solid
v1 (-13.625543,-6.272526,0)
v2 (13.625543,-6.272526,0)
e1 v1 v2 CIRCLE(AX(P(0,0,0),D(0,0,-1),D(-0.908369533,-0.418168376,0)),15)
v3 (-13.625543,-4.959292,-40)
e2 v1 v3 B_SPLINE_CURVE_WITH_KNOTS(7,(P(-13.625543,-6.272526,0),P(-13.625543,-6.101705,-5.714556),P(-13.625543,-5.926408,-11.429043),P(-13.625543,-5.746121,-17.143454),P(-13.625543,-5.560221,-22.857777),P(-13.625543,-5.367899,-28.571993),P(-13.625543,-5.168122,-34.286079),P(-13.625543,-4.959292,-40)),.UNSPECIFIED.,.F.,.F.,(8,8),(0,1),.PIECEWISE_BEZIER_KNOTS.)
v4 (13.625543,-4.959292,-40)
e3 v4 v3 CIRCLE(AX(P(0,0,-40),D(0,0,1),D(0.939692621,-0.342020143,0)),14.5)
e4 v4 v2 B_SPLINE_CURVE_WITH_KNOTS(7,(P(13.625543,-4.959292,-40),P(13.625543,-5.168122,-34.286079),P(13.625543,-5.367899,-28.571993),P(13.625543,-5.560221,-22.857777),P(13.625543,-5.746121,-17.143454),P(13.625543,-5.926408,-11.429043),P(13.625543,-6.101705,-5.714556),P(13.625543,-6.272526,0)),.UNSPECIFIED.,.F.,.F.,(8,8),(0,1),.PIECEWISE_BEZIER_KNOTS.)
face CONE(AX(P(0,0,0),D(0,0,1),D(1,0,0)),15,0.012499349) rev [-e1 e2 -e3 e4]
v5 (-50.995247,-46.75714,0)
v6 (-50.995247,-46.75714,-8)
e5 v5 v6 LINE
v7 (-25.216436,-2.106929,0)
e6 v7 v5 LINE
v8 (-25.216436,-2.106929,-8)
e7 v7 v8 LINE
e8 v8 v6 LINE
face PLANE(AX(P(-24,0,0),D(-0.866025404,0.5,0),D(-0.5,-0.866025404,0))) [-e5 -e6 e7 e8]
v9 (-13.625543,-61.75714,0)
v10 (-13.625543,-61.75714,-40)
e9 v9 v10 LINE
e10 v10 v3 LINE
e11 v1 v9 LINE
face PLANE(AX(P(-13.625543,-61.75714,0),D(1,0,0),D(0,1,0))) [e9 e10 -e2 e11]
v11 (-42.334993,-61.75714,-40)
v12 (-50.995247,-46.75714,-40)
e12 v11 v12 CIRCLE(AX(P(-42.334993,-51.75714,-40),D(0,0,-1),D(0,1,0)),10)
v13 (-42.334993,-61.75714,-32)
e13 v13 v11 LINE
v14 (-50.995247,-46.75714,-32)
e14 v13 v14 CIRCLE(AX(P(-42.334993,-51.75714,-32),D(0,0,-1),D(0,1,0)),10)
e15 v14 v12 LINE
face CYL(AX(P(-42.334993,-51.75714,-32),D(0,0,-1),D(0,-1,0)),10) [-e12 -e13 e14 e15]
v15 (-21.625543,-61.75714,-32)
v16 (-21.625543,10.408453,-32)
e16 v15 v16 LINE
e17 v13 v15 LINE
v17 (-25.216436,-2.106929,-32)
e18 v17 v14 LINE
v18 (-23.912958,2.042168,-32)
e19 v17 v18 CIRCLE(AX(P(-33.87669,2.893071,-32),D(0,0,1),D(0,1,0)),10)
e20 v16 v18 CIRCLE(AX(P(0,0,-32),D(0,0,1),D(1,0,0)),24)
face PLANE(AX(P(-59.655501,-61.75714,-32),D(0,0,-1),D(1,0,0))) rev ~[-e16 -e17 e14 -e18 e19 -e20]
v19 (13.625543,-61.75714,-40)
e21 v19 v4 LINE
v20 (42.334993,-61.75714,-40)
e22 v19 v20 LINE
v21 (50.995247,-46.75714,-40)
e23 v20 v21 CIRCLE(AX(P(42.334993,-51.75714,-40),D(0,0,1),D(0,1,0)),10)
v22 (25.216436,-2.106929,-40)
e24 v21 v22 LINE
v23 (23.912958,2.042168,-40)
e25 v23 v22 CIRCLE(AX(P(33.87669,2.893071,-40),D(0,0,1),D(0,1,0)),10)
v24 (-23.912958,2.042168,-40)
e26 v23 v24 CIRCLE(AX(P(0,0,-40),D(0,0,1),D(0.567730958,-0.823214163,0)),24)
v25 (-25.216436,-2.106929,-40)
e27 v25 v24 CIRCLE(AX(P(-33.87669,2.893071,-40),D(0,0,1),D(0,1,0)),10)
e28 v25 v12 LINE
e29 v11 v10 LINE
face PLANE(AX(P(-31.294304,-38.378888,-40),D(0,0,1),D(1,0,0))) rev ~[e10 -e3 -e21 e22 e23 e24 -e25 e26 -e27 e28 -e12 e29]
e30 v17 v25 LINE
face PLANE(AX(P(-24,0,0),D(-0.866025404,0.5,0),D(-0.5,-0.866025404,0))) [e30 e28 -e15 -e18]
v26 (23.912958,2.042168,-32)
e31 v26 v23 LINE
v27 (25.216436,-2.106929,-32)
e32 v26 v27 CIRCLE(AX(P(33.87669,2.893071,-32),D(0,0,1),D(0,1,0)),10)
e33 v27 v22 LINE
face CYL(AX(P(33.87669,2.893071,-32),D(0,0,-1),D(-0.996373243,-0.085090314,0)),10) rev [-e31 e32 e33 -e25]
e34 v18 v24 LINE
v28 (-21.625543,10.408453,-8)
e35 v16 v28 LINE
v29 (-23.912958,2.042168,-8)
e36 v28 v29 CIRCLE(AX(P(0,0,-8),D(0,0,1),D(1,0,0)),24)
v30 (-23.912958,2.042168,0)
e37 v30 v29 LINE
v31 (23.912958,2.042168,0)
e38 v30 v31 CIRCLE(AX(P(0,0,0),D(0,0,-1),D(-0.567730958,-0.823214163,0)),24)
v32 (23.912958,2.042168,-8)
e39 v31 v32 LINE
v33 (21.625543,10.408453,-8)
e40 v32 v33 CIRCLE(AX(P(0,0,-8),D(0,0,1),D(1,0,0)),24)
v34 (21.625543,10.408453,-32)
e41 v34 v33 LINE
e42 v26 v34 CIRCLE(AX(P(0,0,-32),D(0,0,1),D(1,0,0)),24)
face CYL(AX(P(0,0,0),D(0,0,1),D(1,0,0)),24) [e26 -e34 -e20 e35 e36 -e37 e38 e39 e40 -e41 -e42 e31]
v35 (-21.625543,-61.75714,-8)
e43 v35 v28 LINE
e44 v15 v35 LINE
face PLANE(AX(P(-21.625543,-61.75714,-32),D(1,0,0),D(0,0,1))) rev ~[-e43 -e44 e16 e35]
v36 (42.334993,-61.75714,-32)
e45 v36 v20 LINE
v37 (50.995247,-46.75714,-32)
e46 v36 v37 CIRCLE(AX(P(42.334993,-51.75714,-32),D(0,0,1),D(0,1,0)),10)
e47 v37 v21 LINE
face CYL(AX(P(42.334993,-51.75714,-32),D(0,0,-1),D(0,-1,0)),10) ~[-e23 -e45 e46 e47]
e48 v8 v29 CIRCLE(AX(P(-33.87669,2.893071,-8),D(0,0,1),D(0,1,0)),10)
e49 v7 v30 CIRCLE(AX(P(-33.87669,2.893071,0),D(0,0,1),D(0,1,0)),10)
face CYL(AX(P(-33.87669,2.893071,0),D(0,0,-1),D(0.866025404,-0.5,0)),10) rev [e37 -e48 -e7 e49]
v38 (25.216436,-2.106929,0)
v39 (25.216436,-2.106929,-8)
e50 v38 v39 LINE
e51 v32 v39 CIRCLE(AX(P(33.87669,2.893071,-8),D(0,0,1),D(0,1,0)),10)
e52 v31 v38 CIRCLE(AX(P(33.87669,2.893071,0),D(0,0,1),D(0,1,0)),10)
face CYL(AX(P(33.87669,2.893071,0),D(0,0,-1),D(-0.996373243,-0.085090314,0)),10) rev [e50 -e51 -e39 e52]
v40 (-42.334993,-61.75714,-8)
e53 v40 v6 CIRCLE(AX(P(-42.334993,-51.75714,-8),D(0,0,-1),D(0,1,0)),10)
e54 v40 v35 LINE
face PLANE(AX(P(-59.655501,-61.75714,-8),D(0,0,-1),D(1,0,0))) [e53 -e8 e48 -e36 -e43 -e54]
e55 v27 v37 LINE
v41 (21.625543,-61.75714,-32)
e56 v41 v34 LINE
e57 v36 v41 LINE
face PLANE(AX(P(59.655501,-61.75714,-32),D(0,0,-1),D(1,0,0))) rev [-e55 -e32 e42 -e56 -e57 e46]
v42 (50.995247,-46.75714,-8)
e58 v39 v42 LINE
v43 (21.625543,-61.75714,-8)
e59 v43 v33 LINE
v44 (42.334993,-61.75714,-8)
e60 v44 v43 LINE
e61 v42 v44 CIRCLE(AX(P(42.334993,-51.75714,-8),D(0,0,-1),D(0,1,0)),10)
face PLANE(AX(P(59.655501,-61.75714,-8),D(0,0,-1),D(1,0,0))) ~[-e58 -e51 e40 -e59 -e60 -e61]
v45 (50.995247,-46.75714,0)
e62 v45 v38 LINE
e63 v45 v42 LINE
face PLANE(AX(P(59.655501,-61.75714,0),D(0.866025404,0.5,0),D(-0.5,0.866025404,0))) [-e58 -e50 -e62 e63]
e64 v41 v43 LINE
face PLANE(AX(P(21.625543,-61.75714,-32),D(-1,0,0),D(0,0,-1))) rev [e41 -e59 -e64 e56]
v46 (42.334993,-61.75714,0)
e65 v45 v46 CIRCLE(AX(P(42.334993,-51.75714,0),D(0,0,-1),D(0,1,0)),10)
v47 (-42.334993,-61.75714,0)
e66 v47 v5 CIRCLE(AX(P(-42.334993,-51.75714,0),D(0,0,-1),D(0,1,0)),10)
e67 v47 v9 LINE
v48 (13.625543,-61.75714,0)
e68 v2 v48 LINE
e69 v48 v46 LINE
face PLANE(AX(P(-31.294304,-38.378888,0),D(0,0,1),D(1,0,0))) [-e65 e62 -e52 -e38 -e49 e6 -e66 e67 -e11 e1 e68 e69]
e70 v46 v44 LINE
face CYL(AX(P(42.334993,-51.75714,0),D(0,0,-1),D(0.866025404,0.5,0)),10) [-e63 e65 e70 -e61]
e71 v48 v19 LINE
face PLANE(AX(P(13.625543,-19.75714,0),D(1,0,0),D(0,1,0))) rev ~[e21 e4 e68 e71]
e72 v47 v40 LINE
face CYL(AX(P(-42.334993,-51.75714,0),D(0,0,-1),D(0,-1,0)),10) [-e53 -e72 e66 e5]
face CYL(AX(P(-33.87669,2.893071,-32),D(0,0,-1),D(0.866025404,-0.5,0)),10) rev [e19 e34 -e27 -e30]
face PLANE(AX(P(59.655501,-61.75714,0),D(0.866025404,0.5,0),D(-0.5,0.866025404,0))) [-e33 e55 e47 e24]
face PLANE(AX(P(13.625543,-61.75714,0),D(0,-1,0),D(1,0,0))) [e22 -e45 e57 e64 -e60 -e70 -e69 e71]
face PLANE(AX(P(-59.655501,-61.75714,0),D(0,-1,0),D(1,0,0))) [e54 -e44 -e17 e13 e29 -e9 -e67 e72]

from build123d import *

# Parameters (mm, degrees)
F3_R      = 24
F4_DEPTH  = 40
F0_R      = 15
F2_R      = 14.5
F7_DEPTH  = 40.0010001
F9_DEPTH  = 40
F10_W     = 38.0299583572
F10_H     = 24
F11_DEPTH = 85.7581399225
F12_R     = 10
F13_R     = 10


# Not quite as in the source:
# - a pattern or mirror of a feature is missing from the dataset's text; its kind, count and spacing are read off the source's solid


with BuildPart() as f4:
    # F3 (on Top) → F4 (new body)
    with BuildSketch(Plane.XY):
        Circle(F3_R)
    extrude(amount=-F4_DEPTH)

    # F0 (on Top) → F5 section 0
    with BuildSketch(Plane.XY):
        Circle(F0_R)
    # F2 (on offset) → F5 section 1
    with BuildSketch(Plane.XY.offset(-40)):
        Circle(F2_R)
    loft(mode=Mode.SUBTRACT)

    # F6 (on face) → F7 (cut, through all)
    with BuildSketch(Plane.XY):
        with BuildLine():
            Line((-13.6255430014, -6.272525641), (-13.6255430014, -19.7571399225))
            ThreePointArc((-13.6255430014, -19.7571399225), (0, -24), (13.6255430014, -19.7571399225))
            Line((13.6255430014, -19.7571399225), (13.6255430014, -6.272525641))
            ThreePointArc((13.6255430014, -6.272525641), (0, -15), (-13.6255430014, -6.272525641))
        make_face()
        with BuildLine():
            Line((-13.6255430014, -4.9592920782), (-13.6255430014, -6.272525641))
            ThreePointArc((-13.6255430014, -6.272525641), (0, -15), (13.6255430014, -6.272525641))
            Line((13.6255430014, -6.272525641), (13.6255430014, -4.9592920782))
            ThreePointArc((13.6255430014, -4.9592920782), (0, -14.5), (-13.6255430014, -4.9592920782))
        make_face()
    extrude(amount=-F7_DEPTH, mode=Mode.SUBTRACT)

    # F8 (on face) → F9 (join)
    with BuildSketch(Plane.XY):
        with BuildLine():
            Line((-13.6255430014, -61.7571399225), (-13.6255430014, -19.7571399225))
            ThreePointArc((-13.6255430014, -19.7571399225), (-21.248682689, -11.1576648087), (-24, 0))
            Line((-24, 0), (-59.6555013586, -61.7571399225))
            Line((-59.6555013586, -61.7571399225), (-13.6255430014, -61.7571399225))
        make_face()
        with BuildLine():
            ThreePointArc((24, 0), (21.248682689, -11.1576648087), (13.6255430014, -19.7571399225))
            Line((13.6255430014, -19.7571399225), (13.6255430014, -61.7571399225))
            Line((13.6255430014, -61.7571399225), (59.6555013586, -61.7571399225))
            Line((59.6555013586, -61.7571399225), (24, 0))
        make_face()
    extrude(amount=-F9_DEPTH)

    # F10 (on face) → F11 (cut, through all)
    with BuildSketch(Plane.XZ.offset(61.7571399225)):
        with Locations((-40.64052218, -20)):
            Rectangle(F10_W, F10_H)
    f11 = extrude(amount=-F11_DEPTH, mode=Mode.SUBTRACT)

    # F11_copies: F11 across plane
    add(f11.mirror(Plane(origin=(0, 0, 0), x_dir=(0, 0, 1), z_dir=(1, 0, 0))), mode=Mode.SUBTRACT)

    # F12
    f12_edges = [f4.edges().sort_by_distance(p)[0] for p in [
        (-59.655501, -61.75714, -4),
        (-59.655501, -61.75714, -36),
        (-24, 0, -4),
        (-24, 0, -36),
    ]]
    fillet(f12_edges, radius=F12_R)

    # F13
    f13_edges = [f4.edges().sort_by_distance(p)[0] for p in [
        (59.655501, -61.75714, -4),
        (59.655501, -61.75714, -36),
        (24, 0, -4),
        (24, 0, -36),
    ]]
    fillet(f13_edges, radius=F13_R)


solid = f4.part
